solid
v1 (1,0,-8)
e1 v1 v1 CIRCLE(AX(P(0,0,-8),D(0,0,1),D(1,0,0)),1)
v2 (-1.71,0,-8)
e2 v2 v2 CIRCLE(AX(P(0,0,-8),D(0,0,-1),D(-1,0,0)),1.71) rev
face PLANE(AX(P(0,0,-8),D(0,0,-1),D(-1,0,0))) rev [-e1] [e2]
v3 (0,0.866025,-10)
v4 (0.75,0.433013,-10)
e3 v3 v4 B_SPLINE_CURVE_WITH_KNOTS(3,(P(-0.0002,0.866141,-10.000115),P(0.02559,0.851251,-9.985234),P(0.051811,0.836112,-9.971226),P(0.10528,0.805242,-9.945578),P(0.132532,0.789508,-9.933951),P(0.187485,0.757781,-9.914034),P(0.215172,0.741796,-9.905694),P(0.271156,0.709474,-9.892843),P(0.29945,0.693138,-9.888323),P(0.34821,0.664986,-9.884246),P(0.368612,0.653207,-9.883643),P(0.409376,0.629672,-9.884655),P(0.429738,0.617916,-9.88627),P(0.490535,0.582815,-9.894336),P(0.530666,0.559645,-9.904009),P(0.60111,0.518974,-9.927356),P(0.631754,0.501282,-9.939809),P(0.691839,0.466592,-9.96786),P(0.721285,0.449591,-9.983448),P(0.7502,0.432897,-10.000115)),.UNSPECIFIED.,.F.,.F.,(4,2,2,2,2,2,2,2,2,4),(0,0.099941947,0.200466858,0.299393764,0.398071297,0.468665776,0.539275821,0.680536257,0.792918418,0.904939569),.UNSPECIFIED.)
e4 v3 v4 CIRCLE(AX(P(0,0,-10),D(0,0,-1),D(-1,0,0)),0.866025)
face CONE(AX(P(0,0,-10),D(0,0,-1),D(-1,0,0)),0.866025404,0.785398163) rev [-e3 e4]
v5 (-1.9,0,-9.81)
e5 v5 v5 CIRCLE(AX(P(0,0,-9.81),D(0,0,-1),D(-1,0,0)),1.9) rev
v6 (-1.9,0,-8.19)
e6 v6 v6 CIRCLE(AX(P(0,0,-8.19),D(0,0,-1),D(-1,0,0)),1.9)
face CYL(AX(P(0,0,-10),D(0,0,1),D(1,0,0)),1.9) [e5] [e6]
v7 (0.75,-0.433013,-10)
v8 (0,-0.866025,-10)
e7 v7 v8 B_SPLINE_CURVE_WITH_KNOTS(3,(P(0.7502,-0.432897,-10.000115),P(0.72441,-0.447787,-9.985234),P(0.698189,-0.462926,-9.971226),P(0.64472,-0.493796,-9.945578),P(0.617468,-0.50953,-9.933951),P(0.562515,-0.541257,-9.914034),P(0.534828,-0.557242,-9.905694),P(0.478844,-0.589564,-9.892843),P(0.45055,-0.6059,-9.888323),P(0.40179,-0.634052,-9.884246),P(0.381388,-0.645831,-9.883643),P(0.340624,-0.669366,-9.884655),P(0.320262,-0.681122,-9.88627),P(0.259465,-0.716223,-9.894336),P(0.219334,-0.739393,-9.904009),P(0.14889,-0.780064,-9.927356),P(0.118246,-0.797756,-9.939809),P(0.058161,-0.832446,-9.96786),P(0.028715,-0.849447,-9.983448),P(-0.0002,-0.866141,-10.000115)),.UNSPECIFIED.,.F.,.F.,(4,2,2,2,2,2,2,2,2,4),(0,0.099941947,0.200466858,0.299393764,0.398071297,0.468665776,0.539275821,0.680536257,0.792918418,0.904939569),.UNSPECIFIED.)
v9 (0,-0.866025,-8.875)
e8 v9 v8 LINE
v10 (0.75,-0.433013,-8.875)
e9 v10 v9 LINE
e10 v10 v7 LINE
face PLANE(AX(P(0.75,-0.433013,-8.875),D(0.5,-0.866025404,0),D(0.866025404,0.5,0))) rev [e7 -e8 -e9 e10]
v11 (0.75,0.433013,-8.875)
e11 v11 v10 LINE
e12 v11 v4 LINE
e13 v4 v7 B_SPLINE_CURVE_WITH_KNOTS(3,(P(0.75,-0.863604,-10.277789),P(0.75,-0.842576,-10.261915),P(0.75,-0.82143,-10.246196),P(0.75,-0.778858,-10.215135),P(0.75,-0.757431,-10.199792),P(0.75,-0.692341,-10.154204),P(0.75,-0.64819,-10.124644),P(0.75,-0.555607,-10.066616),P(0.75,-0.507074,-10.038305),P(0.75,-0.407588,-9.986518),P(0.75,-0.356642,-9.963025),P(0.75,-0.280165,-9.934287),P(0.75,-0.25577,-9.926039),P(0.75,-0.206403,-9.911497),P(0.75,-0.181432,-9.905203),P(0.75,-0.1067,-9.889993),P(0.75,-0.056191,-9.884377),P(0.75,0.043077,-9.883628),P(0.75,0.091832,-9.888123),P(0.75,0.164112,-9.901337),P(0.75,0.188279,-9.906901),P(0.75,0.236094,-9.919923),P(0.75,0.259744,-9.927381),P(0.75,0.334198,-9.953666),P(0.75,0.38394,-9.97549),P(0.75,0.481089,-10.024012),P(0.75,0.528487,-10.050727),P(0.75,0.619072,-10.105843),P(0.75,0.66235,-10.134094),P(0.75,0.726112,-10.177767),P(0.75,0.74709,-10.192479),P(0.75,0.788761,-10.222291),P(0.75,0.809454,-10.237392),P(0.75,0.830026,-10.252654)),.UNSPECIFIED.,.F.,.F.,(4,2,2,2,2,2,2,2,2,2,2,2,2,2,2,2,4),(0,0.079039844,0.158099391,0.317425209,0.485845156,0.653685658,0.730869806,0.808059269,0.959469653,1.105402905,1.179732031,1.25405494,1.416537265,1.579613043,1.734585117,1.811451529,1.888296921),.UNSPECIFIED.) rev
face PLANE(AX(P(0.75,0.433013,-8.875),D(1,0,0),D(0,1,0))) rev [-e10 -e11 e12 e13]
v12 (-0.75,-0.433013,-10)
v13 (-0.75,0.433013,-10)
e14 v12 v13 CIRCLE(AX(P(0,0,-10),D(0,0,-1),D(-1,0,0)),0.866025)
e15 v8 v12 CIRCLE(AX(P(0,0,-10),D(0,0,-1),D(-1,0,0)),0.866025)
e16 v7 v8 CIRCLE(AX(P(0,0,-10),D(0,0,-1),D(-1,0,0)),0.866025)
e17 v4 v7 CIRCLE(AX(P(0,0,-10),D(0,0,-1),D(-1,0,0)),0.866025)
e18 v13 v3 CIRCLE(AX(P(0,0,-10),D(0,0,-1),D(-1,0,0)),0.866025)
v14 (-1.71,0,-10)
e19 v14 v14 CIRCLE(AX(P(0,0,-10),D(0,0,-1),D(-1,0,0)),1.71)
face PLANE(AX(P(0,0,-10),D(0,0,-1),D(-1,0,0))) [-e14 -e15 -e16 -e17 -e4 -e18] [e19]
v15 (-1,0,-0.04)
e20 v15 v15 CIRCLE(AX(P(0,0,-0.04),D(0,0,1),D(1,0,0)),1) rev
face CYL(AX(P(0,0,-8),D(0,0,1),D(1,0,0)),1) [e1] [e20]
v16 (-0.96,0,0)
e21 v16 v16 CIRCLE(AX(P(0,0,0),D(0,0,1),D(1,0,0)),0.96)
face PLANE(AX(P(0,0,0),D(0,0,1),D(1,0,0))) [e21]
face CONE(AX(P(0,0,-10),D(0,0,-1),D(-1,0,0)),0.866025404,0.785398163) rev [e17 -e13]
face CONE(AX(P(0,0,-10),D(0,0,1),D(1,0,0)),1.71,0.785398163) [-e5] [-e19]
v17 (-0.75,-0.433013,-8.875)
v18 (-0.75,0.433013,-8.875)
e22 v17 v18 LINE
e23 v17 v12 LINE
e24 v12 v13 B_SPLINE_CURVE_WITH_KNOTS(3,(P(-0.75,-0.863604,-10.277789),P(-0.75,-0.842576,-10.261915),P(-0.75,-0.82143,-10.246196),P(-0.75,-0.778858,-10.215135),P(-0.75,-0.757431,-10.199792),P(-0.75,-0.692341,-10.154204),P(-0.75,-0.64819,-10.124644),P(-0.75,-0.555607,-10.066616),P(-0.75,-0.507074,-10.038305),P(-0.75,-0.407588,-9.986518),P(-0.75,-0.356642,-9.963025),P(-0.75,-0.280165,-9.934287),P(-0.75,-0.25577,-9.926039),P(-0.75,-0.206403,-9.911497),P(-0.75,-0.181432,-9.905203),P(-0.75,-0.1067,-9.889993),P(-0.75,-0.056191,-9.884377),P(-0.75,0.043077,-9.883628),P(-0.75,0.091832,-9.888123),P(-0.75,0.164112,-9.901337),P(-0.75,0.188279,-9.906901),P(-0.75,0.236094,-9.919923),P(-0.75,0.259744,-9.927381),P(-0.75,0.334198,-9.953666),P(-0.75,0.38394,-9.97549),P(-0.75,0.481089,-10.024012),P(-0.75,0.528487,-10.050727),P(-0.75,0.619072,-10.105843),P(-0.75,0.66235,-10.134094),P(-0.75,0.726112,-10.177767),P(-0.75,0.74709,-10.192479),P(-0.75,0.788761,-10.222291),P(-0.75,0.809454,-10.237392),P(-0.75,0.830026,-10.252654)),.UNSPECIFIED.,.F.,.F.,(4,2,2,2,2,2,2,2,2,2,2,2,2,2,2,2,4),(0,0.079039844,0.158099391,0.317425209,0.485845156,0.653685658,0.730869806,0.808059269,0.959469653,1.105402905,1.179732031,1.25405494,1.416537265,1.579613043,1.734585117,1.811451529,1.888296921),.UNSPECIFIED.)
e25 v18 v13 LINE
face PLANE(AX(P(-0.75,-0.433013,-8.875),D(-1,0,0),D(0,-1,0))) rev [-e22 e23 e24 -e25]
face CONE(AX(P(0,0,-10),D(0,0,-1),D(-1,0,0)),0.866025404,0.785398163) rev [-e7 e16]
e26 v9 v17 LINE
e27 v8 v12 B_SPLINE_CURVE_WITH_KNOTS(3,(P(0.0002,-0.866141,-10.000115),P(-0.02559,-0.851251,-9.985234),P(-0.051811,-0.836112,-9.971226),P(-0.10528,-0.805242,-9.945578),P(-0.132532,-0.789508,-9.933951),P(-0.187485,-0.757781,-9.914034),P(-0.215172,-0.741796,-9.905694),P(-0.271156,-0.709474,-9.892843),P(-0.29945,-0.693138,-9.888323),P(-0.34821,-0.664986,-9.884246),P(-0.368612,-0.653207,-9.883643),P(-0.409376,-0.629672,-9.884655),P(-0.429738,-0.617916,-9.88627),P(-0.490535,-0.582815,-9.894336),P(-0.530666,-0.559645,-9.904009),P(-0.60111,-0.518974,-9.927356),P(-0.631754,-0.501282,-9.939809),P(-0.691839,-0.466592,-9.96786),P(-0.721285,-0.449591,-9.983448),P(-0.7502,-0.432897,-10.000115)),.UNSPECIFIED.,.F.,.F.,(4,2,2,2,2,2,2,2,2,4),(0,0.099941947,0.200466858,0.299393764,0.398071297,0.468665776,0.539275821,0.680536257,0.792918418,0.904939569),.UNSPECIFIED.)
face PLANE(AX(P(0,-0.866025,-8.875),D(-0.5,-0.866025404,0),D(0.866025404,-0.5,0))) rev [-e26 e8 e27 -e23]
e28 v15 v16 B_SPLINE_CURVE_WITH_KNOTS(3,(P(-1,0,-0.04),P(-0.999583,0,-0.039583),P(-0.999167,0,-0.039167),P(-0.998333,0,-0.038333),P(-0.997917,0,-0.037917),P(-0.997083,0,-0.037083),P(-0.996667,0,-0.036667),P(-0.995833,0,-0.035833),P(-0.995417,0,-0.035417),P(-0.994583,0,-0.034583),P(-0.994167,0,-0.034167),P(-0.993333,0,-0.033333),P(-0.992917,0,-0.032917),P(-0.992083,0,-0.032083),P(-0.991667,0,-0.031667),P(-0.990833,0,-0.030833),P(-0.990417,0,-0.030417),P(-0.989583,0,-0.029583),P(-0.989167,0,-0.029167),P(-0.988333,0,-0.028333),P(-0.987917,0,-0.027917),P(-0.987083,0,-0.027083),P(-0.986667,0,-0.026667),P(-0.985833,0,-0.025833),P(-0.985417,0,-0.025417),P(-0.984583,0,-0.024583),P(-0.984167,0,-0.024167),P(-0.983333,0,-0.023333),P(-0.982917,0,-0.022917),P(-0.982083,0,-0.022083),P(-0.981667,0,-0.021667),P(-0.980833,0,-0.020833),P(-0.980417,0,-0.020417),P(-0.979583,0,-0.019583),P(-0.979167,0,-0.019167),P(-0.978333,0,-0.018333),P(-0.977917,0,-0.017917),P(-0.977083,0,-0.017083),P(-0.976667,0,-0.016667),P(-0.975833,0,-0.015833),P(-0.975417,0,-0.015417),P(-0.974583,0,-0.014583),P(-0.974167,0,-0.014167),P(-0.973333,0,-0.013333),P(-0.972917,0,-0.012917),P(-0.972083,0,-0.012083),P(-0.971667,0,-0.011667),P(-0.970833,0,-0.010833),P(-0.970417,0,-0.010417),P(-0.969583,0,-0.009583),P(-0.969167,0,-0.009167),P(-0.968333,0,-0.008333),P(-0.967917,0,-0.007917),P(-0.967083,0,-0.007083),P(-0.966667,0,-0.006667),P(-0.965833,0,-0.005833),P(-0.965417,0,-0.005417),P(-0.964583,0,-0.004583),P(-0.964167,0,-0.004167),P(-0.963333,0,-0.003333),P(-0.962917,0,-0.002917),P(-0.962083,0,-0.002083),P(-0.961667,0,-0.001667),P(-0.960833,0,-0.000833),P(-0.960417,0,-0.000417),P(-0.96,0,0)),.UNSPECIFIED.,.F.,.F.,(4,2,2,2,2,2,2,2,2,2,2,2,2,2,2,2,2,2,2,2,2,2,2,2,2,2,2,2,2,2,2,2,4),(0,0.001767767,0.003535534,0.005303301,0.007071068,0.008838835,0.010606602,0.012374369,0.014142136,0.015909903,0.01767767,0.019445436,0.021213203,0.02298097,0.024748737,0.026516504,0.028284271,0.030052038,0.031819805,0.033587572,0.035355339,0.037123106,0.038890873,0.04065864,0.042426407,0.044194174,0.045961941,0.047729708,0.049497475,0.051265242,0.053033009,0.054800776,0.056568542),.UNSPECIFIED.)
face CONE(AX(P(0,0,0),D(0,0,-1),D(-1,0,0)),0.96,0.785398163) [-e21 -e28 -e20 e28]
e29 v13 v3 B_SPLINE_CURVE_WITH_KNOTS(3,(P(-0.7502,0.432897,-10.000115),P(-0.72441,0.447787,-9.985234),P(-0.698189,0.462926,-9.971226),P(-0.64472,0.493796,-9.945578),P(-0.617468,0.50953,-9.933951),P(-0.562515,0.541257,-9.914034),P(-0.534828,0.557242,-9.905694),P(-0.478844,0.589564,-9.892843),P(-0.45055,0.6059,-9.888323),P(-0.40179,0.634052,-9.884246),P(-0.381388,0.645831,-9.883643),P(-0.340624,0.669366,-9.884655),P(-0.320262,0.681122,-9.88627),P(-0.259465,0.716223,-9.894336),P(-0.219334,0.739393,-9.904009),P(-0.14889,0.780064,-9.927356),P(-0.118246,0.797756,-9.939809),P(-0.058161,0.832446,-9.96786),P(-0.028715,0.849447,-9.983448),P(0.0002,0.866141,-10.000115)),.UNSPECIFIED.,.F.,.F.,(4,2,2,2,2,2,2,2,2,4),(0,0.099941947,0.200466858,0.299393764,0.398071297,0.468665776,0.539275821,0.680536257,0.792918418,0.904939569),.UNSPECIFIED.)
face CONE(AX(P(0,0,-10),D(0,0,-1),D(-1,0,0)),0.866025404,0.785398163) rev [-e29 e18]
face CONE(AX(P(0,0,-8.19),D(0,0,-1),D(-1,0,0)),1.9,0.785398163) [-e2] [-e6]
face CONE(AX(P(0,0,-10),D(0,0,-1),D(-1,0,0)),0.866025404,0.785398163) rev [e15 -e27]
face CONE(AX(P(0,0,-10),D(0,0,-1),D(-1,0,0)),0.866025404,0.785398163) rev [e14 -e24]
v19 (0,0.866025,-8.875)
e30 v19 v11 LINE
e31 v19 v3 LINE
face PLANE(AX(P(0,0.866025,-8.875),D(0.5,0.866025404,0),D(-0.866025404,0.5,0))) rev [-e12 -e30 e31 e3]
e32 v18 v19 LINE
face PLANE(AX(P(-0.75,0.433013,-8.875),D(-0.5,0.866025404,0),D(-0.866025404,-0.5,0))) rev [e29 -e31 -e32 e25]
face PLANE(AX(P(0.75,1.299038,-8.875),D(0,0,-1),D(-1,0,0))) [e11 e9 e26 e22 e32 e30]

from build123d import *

# Parameters (mm, degrees)
SKETCH1_R            = 1
EXTRUDE1_DEPTH       = 8
CUT_SWEEP1_PITCH     = 0.4
SKETCH6_R            = 1.9
EXTRUDE2_DEPTH       = 2
CUT_EXTRUDE1_DEPTH   = 1.125
CHAMFER1_SIZE        = 0.19
SKETCH10_R           = 1
PARTIAL_THREAD_DEPTH = 8
CHAMFER2_SIZE        = 0.04


with BuildPart() as part:
    # Sketch1 → Extrude1 (new body)
    with BuildSketch(Plane.XY):
        Circle(SKETCH1_R)
    extrude(amount=-EXTRUDE1_DEPTH)

    # Cut-Sweep1: the profile of Sketch3 profile screwed along a right-hand helix of 21 turns, 6 arcs to a turn; built about Z, then put on its axis
    cut_sweep1_z = Axis((0, 0, 0), (0, 0, 1))
    cut_sweep1_corners = [(1.0003, 0, -0.350173205), (0.740192379, 0, -0.2), (0.740192379, 0, -0.15), (1.0003, 0, 0.000173205)]
    with BuildLine(mode=Mode.PRIVATE) as cut_sweep1_profile:
        Line(cut_sweep1_corners[0], cut_sweep1_corners[1])
        Line(cut_sweep1_corners[1], cut_sweep1_corners[2])
        Line(cut_sweep1_corners[2], cut_sweep1_corners[3])
        Line(cut_sweep1_corners[3], cut_sweep1_corners[0])
    cut_sweep1_cap = Face(cut_sweep1_profile.wire())
    cut_sweep1_turn_angles = [0, 30, 60, 90, 120, 150, 180, 210, 240, 270, 300, 330, 360]
    cut_sweep1_turn_weights = [1, 0.8660254037844387, 1, 0.8660254037844387, 1, 0.8660254037844387, 1, 0.8660254037844387, 1, 0.8660254037844387, 1, 0.8660254037844387, 1]
    cut_sweep1_turn_rails = [Edge.make_bspline([Vector(p[0], p[1], 0).rotate(cut_sweep1_z, cut_sweep1_turn_angles[k]) / cut_sweep1_turn_weights[k] + Vector(0, 0, p[2] + CUT_SWEEP1_PITCH * cut_sweep1_turn_angles[k] / 360) for k in range(13)], [0, 0, 0, 1, 1, 2, 2, 3, 3, 4, 4, 5, 5, 6, 6, 6], 2, cut_sweep1_turn_weights) for p in cut_sweep1_corners]
    cut_sweep1_turn_sides = [Face.make_surface_from_curves(cut_sweep1_turn_rails[p[0]], cut_sweep1_turn_rails[p[1]]) for p in [(0, 1), (1, 2), (2, 3), (3, 0)]]
    cut_sweep1 = Plane(origin=(0, 0, 0), x_dir=(0, 1, 0), z_dir=(0, 0, -1)) * Solid(Shell([*[p.moved(Location((0, 0, CUT_SWEEP1_PITCH * i))) for i in range(21) for p in cut_sweep1_turn_sides], cut_sweep1_cap, cut_sweep1_cap.rotate(cut_sweep1_z, 7560).moved(Location((0, 0, CUT_SWEEP1_PITCH * 7560 / 360)))]))
    add(cut_sweep1, mode=Mode.SUBTRACT)

    # Sketch4 → Cut-Revolve1 (revolve, cut)
    with BuildSketch(Plane(origin=(0, 0, 0), x_dir=(0, 0, -1), z_dir=(1, 0, 0)), mode=Mode.PRIVATE) as cut_revolve1_sk:
        Polygon((0.35977197, 1), (0, 0.486192379), (0, 1), align=None)
    revolve(cut_revolve1_sk.sketch.rotate(Axis((0, 0, 0), (0, 0, -1)), 278.428757719), axis=Axis((0, 0, 0), (0, 0, -1)), mode=Mode.SUBTRACT)

    # Sketch6 → Extrude2 (add)
    with BuildSketch(Plane(origin=(0, 0, -8), x_dir=(-1, 0, 0), z_dir=(0, 0, -1))):
        Circle(SKETCH6_R)
    extrude(amount=EXTRUDE2_DEPTH)

    # Sketch7 → Cut-Extrude1 (cut)
    with BuildSketch(Plane(origin=(0, 0, -10), x_dir=(-1, 0, 0), z_dir=(0, 0, -1))):
        Polygon((0, 0.866025404), (-0.75, 0.433012702), (-0.75, -0.433012702), (0, -0.866025404), (0.75, -0.433012702), (0.75, 0.433012702), align=None)
    extrude(amount=-CUT_EXTRUDE1_DEPTH, mode=Mode.SUBTRACT)

    # Cut-Extrude2 cone 1 section (through the dimple's axis) → Cut-Extrude2 (revolve, cut)
    with BuildSketch(Plane(origin=(0, 0, -10), x_dir=(0, 1, 0), z_dir=(1, 0, 0))):
        Polygon((0, 0), (0.866025404, 0), (0, 0.866025404), align=None)
    revolve(axis=Axis((0, 0, -10), (0, 0, 1)), mode=Mode.SUBTRACT)

    # Chamfer1
    chamfer1_edges = [part.edges().sort_by_distance(p)[0] for p in [
        (1.9, 0, -8),
        (1.9, 0, -10),
    ]]
    chamfer(chamfer1_edges, length=CHAMFER1_SIZE)


with BuildPart() as body_2:
    # Sketch10 → partial thread (new body)
    with BuildSketch(Plane.XY.offset(-8)):
        Circle(SKETCH10_R)
    extrude(amount=PARTIAL_THREAD_DEPTH)

    # Chamfer2
    chamfer2_edges = [body_2.edges().sort_by_distance(p)[0] for p in [
        (-1, 0, 0),
    ]]
    chamfer(chamfer2_edges, length=CHAMFER2_SIZE)


with BuildPart() as part_1:
    add(part.part)

    # Combine1: union body 2
    add(body_2.part)


solid = part_1.part
